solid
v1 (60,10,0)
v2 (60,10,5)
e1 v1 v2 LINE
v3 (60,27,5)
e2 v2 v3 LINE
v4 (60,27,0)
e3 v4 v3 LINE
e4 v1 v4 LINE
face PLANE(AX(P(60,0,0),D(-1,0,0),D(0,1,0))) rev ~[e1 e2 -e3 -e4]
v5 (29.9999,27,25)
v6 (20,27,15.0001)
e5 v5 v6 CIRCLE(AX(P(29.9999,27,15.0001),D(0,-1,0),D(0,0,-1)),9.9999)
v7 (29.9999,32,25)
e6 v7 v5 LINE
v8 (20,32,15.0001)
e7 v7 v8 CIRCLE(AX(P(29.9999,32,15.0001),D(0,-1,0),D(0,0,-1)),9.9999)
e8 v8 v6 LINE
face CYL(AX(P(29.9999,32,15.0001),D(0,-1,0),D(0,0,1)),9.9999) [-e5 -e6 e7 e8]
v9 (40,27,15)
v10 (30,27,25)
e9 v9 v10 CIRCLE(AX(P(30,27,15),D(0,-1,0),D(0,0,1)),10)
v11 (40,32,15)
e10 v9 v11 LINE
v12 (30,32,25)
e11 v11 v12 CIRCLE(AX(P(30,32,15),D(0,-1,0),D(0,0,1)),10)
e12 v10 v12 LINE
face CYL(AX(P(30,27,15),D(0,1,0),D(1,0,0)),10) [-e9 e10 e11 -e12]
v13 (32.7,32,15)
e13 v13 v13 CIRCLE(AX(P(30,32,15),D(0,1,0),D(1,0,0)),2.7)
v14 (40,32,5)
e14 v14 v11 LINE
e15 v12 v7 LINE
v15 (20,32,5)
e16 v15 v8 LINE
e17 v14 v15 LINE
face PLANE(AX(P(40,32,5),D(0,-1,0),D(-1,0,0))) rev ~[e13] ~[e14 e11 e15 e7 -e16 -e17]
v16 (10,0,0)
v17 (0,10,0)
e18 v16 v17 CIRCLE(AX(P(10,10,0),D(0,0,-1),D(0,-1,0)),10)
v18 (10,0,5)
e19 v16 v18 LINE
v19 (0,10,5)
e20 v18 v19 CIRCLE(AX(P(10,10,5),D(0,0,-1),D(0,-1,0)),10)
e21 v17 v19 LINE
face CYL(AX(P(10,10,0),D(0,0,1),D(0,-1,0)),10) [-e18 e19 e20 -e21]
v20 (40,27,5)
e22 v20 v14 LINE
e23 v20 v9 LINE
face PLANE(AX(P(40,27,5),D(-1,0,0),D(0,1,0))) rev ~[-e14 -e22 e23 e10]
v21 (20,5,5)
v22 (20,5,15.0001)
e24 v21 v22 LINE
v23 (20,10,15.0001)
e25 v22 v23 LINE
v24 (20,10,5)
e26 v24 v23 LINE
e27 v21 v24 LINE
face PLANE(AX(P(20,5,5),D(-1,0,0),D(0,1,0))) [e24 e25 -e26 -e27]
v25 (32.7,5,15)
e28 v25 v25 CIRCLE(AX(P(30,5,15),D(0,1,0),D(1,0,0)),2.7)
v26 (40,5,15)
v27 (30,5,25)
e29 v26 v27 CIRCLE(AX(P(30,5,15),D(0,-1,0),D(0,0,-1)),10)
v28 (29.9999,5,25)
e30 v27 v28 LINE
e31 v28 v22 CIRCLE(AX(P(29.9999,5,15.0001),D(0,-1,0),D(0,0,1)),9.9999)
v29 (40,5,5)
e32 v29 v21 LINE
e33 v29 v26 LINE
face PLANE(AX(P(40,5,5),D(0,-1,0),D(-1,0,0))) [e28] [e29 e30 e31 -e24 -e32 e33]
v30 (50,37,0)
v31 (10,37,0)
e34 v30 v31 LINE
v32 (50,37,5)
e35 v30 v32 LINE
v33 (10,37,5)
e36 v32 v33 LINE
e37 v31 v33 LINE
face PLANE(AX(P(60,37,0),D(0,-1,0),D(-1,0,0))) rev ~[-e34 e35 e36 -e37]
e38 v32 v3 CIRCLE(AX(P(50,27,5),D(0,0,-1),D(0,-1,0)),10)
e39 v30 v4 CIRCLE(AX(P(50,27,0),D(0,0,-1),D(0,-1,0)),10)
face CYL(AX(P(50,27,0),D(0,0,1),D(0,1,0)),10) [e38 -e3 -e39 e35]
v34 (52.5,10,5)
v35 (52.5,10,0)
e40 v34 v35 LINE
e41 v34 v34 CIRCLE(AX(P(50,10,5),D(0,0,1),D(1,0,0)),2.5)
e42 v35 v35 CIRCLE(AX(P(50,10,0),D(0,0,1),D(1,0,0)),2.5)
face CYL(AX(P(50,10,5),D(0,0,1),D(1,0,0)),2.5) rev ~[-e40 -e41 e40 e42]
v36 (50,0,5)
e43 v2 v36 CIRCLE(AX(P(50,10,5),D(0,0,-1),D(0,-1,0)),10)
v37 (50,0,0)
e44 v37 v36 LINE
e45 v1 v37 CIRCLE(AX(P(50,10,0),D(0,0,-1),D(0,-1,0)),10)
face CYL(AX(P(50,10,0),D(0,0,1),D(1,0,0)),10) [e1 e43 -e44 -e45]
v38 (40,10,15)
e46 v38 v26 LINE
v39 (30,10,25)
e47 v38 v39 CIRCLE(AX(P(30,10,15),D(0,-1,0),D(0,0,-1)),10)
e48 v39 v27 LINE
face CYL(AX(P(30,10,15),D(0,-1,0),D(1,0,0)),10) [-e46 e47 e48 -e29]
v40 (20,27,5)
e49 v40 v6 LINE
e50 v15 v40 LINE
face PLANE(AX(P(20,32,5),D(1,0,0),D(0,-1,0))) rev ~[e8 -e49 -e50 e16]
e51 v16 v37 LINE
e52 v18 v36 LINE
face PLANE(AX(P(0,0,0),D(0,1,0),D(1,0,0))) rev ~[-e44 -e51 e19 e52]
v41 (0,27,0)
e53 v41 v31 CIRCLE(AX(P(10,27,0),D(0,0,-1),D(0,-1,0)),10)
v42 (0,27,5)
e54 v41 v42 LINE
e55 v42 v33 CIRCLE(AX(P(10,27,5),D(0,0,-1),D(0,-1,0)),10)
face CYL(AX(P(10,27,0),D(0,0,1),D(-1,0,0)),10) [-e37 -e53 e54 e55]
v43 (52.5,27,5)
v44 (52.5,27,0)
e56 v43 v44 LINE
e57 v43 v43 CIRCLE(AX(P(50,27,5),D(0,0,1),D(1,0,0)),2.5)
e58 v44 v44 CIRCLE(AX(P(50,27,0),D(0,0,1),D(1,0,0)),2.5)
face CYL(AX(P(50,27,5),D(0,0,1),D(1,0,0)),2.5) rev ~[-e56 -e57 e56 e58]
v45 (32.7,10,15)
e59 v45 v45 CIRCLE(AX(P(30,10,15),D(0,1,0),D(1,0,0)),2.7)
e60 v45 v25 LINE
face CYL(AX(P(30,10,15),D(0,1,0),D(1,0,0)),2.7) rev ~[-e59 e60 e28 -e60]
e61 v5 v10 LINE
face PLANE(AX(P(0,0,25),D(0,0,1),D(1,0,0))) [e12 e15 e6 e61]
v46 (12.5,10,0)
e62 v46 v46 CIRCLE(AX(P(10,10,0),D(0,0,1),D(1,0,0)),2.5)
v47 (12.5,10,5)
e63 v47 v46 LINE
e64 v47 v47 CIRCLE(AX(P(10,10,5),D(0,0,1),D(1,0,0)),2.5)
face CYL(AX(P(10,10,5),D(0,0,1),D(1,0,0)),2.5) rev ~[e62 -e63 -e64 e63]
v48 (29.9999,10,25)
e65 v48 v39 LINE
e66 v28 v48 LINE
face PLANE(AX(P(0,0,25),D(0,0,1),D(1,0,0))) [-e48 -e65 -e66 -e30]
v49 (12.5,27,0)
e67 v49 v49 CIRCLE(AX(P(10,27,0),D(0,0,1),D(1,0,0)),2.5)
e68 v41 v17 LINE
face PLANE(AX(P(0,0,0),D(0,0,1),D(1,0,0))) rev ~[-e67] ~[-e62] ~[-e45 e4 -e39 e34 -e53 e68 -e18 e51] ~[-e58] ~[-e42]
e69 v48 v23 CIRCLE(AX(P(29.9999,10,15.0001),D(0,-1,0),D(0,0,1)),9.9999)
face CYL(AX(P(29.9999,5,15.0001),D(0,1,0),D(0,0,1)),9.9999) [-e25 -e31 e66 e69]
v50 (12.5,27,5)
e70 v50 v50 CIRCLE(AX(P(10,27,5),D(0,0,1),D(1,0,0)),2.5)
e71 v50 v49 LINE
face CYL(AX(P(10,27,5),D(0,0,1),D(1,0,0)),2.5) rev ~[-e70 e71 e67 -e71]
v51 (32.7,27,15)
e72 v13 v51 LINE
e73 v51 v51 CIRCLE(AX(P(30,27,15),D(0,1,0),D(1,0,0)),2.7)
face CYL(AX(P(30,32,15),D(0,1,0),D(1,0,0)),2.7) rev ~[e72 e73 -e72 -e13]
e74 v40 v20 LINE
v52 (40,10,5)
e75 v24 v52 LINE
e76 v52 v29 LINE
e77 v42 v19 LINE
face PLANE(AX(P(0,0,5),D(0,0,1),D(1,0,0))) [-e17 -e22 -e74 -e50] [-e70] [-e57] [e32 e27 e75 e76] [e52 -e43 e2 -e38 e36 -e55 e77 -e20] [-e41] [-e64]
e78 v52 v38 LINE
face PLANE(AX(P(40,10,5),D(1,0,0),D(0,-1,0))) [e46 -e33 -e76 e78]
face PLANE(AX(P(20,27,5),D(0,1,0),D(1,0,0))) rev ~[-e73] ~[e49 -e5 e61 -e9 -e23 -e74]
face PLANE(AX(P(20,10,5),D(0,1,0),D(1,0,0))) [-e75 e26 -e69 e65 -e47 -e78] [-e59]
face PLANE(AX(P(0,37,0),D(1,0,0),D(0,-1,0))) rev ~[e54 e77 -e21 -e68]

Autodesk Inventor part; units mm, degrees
ref_plane "YZ Plane" through (0, 0, 0) normal (1, 0, 0) x (0, 1, 0)
ref_plane "XZ Plane" through (0, 0, 0) normal (0, 1, 0) x (-1, 0, 0)
ref_plane "XY Plane" through (0, 0, 0) normal (0, 0, 1) x (1, 0, 0)
sketch "Sketch1" plane through (0, 0, 0) normal (0, 0, 1) x (1, 0, 0)
  line L0 (0, 0) -> (60, 0)
  line L1 (60, 0) -> (60, 37)
  line L2 (60, 37) -> (0, 37)
  line L3 (0, 37) -> (0, 0)
  dimension "d0" = 60
  dimension "d1" = 37
extrude "Extrusion1" add sketch "Sketch1" along normal blind 5
sketch "Sketch2" plane through (0, 0, 5) normal (0, 0, 1) x (1, 0, 0)
  line L0 (20, 27) -> (40, 27)
  line L1 (40, 27) -> (40, 32)
  line L2 (40, 32) -> (20, 32)
  line L3 (20, 32) -> (20, 27)
  line L4 (20, 10) -> (40, 10)
  line L5 (40, 10) -> (40, 5)
  line L6 (40, 5) -> (20, 5)
  line L7 (20, 5) -> (20, 10)
  point P0 (0, 0)
  dimension "d6" = 20
  dimension "d7" = 5
  dimension "d8" = 20
  dimension "d9" = 5
extrude "Extrusion2" add sketch "Sketch2" along normal blind 20
sketch "Sketch3" plane through (20, 32, 5) normal (0, 1, 0) x (1, 0, 0)
  circle A0 centre (10, -10) radius 2.7
  point P0 (-20, 5)
  dimension "d12" = 5.4
extrude "Extrusion3" cut sketch "Sketch3" against normal blind 20
sketch "Sketch4" plane through (20, 10, 5) normal (0, 1, 0) x (1, 0, 0)
  circle A0 centre (10, -10) radius 2.7
  point P0 (-20, 5)
  dimension "d15" = 5.4
extrude "Extrusion4" cut sketch "Sketch4" against normal blind 20
fillet "Fillet1" radius 10 1 edges at (40, 29.5, 25)
fillet "Fillet2" radius 10 1 edges at (20, 29.5, 25)
fillet "Fillet3" radius 10 1 edges at (40, 7.5, 25)
fillet "Fillet4" radius 10 1 edges at (20, 7.5, 25)
sketch "Sketch5" plane through (0, 0, 5) normal (0, 0, 1) x (1, 0, 0)
  circle A0 centre (10, 10) radius 2.5
  circle A1 centre (50, 10) radius 2.5
  circle A2 centre (10, 27) radius 2.5
  circle A3 centre (50, 27) radius 2.5
  point P0 (0, 0)
  dimension "d22" = 5
  dimension "d23" = 5
  dimension "d24" = 5
  dimension "d25" = 5
extrude "Extrusion5" cut sketch "Sketch5" against normal blind 20
fillet "Fillet5" radius 10 1 edges at (0, 37, 2.5)
fillet "Fillet6" radius 10 1 edges at (60, 37, 2.5)
fillet "Fillet7" radius 10 1 edges at (60, 0, 2.5)
fillet "Fillet8" radius 10 1 edges at (0, 0, 2.5)
properties part number "sail_hold_1"
